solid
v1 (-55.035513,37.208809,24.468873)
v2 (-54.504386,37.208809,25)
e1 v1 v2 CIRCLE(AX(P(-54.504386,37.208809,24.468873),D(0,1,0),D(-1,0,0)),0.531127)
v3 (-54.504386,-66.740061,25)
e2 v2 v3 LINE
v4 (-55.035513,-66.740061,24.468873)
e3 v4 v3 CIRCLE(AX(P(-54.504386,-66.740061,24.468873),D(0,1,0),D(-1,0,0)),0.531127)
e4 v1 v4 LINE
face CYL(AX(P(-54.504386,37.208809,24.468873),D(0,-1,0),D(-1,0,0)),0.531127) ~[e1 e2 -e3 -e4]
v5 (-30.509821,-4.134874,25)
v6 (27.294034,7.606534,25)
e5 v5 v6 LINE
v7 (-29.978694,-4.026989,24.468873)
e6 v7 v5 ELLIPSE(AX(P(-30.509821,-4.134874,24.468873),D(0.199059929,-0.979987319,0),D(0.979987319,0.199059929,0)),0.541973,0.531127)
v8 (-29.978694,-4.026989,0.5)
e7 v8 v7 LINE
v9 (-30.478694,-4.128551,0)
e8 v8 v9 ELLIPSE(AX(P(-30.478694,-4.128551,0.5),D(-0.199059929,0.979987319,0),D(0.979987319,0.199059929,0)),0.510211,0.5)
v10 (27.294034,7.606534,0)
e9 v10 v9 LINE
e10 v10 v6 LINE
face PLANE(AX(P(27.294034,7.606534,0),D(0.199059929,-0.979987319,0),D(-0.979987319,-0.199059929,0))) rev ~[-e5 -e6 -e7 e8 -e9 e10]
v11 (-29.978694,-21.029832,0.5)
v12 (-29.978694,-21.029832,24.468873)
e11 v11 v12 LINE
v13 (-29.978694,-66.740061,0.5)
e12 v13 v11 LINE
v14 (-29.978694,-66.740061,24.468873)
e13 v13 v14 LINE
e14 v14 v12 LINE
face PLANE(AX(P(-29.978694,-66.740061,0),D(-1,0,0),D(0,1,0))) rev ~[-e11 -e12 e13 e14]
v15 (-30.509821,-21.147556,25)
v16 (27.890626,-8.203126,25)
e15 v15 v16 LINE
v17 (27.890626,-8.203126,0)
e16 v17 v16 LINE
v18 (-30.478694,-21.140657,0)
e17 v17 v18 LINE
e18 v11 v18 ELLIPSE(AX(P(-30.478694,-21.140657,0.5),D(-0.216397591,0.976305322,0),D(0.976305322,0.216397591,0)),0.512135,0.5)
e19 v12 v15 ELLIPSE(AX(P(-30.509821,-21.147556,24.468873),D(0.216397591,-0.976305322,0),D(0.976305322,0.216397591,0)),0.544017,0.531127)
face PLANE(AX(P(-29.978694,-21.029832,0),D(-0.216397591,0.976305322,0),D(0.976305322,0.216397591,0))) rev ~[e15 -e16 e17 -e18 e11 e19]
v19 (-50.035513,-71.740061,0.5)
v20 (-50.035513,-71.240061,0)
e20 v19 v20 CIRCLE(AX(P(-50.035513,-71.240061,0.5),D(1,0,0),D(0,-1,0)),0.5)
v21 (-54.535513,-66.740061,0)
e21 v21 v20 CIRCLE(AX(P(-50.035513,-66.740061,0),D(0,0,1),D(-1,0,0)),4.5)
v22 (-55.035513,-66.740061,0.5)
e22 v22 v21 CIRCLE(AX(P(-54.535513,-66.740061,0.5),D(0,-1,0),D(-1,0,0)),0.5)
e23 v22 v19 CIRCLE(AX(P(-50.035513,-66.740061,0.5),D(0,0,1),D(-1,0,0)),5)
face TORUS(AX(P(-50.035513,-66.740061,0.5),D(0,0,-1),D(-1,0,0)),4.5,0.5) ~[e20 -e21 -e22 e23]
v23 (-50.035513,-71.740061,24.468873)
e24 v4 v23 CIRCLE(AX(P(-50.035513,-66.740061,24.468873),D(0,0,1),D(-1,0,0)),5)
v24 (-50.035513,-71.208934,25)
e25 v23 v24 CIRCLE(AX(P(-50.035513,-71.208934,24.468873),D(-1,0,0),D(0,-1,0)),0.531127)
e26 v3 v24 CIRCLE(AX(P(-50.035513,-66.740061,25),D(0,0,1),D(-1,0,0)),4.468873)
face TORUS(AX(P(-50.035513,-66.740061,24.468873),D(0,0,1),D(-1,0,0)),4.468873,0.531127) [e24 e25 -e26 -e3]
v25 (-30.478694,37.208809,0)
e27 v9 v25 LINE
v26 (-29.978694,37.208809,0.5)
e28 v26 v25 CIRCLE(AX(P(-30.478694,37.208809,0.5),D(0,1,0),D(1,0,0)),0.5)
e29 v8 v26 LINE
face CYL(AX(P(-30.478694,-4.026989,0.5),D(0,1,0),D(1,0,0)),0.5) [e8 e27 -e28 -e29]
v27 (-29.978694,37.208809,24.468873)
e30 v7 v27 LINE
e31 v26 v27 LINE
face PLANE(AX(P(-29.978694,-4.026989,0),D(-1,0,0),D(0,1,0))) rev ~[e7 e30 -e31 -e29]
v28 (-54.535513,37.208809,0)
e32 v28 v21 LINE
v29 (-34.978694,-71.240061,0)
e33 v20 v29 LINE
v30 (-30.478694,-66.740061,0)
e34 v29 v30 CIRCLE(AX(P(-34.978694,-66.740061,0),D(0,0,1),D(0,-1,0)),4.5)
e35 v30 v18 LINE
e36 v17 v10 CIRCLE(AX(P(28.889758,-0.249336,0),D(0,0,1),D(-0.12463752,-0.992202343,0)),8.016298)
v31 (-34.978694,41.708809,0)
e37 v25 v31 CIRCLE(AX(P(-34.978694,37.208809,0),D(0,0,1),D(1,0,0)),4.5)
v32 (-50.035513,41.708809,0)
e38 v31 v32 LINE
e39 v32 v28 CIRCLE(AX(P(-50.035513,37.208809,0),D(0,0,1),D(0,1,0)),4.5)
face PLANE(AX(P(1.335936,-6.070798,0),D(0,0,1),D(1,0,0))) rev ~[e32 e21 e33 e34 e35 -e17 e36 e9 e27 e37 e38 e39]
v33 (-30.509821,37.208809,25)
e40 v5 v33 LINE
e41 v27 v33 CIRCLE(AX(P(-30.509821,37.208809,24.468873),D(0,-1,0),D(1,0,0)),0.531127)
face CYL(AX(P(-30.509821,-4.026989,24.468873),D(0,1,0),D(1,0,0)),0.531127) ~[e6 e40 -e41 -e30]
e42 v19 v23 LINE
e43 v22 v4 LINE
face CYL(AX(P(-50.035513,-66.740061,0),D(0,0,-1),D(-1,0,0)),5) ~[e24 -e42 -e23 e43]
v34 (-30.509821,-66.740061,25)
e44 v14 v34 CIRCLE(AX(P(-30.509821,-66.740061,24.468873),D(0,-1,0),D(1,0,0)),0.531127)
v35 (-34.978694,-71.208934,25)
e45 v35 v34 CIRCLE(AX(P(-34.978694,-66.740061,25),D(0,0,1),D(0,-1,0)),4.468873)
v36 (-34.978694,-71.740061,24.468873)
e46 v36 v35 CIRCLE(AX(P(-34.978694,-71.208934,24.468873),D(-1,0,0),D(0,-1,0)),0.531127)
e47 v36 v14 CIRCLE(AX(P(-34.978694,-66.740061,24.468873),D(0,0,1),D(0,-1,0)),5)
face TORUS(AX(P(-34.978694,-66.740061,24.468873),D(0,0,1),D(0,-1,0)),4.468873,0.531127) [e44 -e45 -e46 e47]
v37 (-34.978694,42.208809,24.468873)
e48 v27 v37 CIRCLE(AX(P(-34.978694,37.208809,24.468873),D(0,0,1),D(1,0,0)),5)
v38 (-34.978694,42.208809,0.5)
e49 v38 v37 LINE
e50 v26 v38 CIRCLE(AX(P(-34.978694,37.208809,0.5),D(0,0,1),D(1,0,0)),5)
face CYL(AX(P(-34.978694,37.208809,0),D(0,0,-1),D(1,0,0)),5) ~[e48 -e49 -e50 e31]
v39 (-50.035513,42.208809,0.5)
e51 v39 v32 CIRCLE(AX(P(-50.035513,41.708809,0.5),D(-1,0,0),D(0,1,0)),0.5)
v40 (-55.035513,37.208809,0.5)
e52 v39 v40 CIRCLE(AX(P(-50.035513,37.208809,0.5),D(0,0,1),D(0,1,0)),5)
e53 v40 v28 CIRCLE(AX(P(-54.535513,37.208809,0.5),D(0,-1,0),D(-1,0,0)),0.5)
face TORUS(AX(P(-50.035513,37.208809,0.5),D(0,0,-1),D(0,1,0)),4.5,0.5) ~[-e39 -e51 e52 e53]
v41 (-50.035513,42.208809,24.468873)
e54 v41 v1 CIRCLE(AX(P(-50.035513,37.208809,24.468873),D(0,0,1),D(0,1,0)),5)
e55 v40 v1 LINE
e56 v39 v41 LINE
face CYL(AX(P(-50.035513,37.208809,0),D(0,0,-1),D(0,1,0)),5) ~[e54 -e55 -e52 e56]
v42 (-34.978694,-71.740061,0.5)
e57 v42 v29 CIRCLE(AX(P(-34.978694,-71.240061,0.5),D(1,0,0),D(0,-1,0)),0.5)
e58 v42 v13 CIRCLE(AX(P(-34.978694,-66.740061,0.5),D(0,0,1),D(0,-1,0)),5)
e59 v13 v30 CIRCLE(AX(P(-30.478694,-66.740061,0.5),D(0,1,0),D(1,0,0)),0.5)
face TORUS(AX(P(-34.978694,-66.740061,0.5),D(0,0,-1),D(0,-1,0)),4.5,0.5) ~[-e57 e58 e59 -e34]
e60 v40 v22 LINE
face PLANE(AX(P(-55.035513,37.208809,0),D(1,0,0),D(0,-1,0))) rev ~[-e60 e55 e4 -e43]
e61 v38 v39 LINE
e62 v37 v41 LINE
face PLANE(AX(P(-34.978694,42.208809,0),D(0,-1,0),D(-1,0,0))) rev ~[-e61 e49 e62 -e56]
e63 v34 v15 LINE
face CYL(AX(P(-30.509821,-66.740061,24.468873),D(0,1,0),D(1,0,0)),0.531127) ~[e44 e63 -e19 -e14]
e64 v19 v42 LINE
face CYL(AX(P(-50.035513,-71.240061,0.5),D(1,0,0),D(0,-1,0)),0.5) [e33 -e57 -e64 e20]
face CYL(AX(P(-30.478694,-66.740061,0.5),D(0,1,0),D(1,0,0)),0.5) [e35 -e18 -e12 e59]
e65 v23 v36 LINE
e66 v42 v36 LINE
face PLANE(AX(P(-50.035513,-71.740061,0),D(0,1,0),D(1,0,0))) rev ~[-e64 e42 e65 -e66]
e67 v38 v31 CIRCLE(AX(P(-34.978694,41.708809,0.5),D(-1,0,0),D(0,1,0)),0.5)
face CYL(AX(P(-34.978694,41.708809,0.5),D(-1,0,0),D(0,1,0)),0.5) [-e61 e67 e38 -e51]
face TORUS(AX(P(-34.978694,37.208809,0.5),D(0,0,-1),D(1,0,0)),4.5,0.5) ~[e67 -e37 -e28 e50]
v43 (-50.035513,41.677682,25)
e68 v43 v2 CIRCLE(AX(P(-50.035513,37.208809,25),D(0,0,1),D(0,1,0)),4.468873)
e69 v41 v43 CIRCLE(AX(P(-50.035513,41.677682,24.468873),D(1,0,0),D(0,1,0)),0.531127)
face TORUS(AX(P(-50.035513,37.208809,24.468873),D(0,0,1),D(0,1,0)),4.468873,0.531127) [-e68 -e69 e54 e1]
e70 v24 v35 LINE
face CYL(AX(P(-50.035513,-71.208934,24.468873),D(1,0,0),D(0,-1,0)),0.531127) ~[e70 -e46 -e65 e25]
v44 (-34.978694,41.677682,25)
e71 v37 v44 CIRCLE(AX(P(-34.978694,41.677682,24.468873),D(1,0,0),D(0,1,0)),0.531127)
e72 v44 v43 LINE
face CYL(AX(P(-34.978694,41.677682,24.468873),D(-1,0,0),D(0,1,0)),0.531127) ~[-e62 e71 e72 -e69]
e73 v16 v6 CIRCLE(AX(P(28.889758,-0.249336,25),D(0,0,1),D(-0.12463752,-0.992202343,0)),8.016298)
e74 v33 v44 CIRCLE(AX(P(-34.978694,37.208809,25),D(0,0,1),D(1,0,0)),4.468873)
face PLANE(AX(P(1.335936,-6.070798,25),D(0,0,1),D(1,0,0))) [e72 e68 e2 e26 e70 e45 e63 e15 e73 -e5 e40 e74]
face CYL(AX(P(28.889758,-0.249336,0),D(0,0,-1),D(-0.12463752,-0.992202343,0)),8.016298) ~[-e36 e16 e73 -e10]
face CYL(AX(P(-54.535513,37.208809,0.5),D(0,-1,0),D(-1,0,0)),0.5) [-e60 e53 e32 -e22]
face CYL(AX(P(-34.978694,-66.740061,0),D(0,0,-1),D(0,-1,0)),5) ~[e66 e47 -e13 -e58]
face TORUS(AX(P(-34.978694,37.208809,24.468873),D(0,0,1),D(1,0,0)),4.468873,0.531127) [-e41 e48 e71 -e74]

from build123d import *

# Parameters (mm, degrees)
F1_DEPTH = 25
F4_R     = 0.5311269837
F5_R     = 0.5


# Not quite as in the source:
# - the program builds the solid bodies; features that only make, move or delete a surface that nothing else refers to are left out


with BuildPart() as f1:
    # F0 (on Top) → F1 (new body)
    with BuildSketch(Plane.XY):
        with BuildLine():
            Line((27.2940341383, 7.6065342873), (-29.9786943942, -4.0269889869))
            Line((-29.9786943942, -4.0269889869), (-29.9786943942, -21.0298318416))
            Line((-29.9786943942, -21.0298318416), (27.8906263411, -8.2031255588))
            ThreePointArc((27.8906263411, -8.2031255588), (36.9003542168, 0.052951297), (27.2940341383, 7.6065342873))
        make_face()
        with BuildLine():
            Line((-34.9786943942, 42.2088094056), (-50.0355128944, 42.2088094056))
            ThreePointArc((-50.0355128944, 42.2088094056), (-53.5710468003, 40.7443433115), (-55.0355128944, 37.2088094056))
            Line((-55.0355128944, 37.2088094056), (-55.0355128944, -66.7400610447))
            ThreePointArc((-55.0355128944, -66.7400610447), (-53.5710468003, -70.2755949506), (-50.0355128944, -71.7400610447))
            Line((-50.0355128944, -71.7400610447), (-34.9786943942, -71.7400610447))
            ThreePointArc((-34.9786943942, -71.7400610447), (-31.4431604883, -70.2755949506), (-29.9786943942, -66.7400610447))
            Line((-29.9786943942, -66.7400610447), (-29.9786943942, -21.0298318416))
            Line((-29.9786943942, -21.0298318416), (-29.9786943942, -4.0269889869))
            Line((-29.9786943942, -4.0269889869), (-29.9786943942, 37.2088094056))
            ThreePointArc((-29.9786943942, 37.2088094056), (-31.4431604883, 40.7443433115), (-34.9786943942, 42.2088094056))
        make_face()
    extrude(amount=F1_DEPTH)

    # F4
    f4_edges = [f1.edges().sort_by_distance(p)[0] for p in [
        (-29.978694, -43.884946, 25),
    ]]
    fillet(f4_edges, radius=F4_R)

    # F5
    f5_edges = [f1.edges().sort_by_distance(p)[0] for p in [
        (-29.978694, -43.884946, 0),
    ]]
    fillet(f5_edges, radius=F5_R)


solid = f1.part
